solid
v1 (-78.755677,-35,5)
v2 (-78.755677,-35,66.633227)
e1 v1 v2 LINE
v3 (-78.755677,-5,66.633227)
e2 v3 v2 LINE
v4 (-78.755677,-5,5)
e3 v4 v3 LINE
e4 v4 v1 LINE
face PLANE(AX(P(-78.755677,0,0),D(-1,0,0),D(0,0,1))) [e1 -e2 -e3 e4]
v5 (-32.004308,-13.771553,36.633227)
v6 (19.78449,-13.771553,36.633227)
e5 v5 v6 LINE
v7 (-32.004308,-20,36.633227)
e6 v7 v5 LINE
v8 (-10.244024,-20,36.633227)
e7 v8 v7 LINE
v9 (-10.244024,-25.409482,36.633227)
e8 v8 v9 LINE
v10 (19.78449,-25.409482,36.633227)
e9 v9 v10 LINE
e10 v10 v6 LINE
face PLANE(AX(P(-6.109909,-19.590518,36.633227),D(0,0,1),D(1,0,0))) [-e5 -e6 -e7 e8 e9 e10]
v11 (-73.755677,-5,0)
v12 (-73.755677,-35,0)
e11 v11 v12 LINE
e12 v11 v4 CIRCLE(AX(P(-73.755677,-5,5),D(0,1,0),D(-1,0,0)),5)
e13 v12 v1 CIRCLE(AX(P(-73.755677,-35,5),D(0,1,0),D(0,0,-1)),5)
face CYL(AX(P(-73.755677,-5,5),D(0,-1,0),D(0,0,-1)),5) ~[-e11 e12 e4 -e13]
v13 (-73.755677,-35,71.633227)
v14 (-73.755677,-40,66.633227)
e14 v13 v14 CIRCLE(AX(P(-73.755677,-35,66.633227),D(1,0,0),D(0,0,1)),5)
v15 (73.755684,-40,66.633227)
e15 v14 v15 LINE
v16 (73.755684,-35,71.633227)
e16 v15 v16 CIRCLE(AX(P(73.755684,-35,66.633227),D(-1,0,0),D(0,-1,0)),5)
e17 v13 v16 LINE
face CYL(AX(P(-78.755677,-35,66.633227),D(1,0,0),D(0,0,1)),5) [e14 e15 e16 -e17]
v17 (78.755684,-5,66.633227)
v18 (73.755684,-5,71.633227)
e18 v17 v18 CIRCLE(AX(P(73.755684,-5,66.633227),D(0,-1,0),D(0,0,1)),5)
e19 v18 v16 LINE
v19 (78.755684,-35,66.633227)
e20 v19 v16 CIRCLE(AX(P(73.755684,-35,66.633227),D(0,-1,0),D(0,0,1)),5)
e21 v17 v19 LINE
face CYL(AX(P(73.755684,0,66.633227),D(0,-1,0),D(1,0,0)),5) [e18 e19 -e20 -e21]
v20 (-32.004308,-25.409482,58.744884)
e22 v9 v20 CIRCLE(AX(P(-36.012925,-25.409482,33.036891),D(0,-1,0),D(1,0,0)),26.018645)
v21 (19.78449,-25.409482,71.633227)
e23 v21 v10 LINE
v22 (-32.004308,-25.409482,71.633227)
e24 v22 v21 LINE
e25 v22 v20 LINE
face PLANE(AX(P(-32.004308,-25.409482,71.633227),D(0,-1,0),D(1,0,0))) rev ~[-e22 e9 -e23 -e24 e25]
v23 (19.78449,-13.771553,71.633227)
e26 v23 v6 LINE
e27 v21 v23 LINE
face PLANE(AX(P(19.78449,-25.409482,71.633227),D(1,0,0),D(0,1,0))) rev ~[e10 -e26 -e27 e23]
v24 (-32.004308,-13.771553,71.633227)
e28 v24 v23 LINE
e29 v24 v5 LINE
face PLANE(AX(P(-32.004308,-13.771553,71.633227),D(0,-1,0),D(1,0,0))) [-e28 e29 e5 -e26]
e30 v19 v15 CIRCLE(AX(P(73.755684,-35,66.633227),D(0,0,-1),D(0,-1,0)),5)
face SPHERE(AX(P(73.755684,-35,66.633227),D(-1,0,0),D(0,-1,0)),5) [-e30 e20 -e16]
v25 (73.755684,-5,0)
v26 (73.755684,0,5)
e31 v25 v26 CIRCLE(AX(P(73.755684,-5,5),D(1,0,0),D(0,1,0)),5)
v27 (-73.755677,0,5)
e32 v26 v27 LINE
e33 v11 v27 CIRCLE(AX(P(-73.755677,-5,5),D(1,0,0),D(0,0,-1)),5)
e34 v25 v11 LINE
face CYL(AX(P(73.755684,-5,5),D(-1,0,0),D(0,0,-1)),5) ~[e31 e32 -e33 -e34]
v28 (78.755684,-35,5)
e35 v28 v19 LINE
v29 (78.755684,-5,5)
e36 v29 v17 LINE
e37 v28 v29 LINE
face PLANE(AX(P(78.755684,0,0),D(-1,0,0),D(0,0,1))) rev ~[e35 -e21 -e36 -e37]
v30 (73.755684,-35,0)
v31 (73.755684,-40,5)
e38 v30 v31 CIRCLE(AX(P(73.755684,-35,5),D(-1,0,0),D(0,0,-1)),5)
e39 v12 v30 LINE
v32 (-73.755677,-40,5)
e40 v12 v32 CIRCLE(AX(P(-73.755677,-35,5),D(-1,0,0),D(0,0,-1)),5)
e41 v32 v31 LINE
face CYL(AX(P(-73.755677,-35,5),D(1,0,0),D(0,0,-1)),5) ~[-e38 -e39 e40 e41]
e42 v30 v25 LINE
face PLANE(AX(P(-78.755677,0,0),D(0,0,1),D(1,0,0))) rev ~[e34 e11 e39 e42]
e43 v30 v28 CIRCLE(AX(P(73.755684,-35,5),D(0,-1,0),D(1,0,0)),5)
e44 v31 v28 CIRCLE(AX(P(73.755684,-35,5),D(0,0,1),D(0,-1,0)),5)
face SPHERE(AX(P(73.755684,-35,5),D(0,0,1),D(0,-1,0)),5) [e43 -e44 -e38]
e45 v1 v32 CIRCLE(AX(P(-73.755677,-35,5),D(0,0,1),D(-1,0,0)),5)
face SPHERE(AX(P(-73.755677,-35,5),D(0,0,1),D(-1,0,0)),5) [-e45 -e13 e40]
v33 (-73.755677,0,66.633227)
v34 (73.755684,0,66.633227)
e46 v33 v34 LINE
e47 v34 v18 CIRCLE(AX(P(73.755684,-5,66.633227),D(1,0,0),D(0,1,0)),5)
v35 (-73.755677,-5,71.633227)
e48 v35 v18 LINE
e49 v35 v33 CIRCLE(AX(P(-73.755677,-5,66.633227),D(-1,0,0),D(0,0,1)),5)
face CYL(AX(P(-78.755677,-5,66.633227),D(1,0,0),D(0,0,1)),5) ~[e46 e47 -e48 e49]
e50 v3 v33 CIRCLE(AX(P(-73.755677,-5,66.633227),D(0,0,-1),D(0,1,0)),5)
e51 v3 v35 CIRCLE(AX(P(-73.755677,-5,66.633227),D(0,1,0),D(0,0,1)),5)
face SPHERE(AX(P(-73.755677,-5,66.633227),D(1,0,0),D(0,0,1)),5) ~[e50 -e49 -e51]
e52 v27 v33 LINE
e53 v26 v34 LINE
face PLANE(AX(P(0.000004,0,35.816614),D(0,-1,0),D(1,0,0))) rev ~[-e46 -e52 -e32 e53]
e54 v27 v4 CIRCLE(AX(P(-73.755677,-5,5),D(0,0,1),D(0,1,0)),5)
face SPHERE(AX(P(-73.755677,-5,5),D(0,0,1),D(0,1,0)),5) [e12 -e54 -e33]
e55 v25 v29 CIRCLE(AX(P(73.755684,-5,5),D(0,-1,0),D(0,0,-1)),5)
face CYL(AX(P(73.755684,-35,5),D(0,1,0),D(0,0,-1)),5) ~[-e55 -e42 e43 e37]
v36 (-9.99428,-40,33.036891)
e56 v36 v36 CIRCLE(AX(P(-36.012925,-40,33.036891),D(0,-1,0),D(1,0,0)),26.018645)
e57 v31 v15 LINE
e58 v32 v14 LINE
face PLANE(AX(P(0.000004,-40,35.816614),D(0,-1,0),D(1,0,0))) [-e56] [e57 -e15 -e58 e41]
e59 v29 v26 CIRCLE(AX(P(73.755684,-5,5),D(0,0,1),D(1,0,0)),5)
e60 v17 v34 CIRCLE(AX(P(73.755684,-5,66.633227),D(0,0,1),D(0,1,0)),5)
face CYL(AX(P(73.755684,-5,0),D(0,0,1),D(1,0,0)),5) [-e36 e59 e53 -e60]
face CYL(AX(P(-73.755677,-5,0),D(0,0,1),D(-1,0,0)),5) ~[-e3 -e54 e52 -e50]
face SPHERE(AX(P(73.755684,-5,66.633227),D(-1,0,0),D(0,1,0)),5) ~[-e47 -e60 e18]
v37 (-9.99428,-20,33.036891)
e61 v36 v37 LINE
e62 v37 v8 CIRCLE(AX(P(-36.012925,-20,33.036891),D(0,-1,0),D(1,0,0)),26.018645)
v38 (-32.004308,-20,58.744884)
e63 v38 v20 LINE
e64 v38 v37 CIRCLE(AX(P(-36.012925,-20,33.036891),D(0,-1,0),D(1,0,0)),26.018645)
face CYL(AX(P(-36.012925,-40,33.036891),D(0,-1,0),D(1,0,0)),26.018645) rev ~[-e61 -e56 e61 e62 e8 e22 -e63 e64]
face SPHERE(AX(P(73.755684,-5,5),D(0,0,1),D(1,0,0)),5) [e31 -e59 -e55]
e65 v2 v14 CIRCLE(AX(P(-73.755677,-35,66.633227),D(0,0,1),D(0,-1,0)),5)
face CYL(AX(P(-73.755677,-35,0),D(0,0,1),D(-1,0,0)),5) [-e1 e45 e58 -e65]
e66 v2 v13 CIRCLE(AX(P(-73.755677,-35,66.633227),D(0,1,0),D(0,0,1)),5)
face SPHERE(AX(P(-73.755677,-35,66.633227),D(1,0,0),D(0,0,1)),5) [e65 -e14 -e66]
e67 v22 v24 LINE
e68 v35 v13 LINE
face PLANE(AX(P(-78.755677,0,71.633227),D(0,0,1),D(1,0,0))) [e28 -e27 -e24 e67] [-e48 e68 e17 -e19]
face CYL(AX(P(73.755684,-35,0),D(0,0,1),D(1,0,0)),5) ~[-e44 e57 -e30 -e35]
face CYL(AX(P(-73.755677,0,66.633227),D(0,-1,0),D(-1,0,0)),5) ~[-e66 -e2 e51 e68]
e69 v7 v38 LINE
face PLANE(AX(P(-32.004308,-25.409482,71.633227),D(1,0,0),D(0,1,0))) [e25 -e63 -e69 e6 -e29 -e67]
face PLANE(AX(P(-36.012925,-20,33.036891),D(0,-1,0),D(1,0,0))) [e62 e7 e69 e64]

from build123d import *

# Parameters (mm, degrees)
F0_W     = 157.5113609433
F0_H     = 71.6332271695
F1_DEPTH = 40
F2_R     = 5
F3_R     = 26.0186453027
F4_DEPTH = 20
F5_W     = 51.7887976021
F5_H     = 11.637929827
F6_DEPTH = 35
F7_R     = 5


# Not quite as in the source:
# - the program builds the solid bodies; features that only make, move or delete a surface that nothing else refers to are left out


with BuildPart() as f1:
    # F0 (on Front) → F1 (new body)
    with BuildSketch(Plane.XZ):
        with Locations((3.7253e-06, 35.8166135848)):
            Rectangle(F0_W, F0_H)
    extrude(amount=F1_DEPTH)

    # F2
    f2_edges = [f1.edges().sort_by_distance(p)[0] for p in [
        (4e-06, -40, 71.633227),
        (4e-06, 0, 71.633227),
        (78.755684, -40, 35.816614),
        (78.755684, 0, 35.816614),
        (78.755684, -20, 71.633227),
        (-78.755677, -20, 71.633227),
        (-78.755677, 0, 35.816614),
        (-78.755677, -40, 35.816614),
    ]]
    fillet(f2_edges, radius=F2_R)

    # F3 (on face) → F4 (cut)
    with BuildSketch(Plane.XZ.offset(40)):
        with Locations((-36.0129252076, 33.036891371)):
            Circle(F3_R)
    extrude(amount=-F4_DEPTH, mode=Mode.SUBTRACT)

    # F5 (on face) → F6 (cut)
    with BuildSketch(Plane.XY.offset(71.6332271695)):
        with Locations((-6.1099091545, -19.590517506)):
            Rectangle(F5_W, F5_H)
    extrude(amount=-F6_DEPTH, mode=Mode.SUBTRACT)

    # F7
    f7_edges = [f1.edges().sort_by_distance(p)[0] for p in [
        (4e-06, -40, 0),
    ]]
    fillet(f7_edges, radius=F7_R)


solid = f1.part
